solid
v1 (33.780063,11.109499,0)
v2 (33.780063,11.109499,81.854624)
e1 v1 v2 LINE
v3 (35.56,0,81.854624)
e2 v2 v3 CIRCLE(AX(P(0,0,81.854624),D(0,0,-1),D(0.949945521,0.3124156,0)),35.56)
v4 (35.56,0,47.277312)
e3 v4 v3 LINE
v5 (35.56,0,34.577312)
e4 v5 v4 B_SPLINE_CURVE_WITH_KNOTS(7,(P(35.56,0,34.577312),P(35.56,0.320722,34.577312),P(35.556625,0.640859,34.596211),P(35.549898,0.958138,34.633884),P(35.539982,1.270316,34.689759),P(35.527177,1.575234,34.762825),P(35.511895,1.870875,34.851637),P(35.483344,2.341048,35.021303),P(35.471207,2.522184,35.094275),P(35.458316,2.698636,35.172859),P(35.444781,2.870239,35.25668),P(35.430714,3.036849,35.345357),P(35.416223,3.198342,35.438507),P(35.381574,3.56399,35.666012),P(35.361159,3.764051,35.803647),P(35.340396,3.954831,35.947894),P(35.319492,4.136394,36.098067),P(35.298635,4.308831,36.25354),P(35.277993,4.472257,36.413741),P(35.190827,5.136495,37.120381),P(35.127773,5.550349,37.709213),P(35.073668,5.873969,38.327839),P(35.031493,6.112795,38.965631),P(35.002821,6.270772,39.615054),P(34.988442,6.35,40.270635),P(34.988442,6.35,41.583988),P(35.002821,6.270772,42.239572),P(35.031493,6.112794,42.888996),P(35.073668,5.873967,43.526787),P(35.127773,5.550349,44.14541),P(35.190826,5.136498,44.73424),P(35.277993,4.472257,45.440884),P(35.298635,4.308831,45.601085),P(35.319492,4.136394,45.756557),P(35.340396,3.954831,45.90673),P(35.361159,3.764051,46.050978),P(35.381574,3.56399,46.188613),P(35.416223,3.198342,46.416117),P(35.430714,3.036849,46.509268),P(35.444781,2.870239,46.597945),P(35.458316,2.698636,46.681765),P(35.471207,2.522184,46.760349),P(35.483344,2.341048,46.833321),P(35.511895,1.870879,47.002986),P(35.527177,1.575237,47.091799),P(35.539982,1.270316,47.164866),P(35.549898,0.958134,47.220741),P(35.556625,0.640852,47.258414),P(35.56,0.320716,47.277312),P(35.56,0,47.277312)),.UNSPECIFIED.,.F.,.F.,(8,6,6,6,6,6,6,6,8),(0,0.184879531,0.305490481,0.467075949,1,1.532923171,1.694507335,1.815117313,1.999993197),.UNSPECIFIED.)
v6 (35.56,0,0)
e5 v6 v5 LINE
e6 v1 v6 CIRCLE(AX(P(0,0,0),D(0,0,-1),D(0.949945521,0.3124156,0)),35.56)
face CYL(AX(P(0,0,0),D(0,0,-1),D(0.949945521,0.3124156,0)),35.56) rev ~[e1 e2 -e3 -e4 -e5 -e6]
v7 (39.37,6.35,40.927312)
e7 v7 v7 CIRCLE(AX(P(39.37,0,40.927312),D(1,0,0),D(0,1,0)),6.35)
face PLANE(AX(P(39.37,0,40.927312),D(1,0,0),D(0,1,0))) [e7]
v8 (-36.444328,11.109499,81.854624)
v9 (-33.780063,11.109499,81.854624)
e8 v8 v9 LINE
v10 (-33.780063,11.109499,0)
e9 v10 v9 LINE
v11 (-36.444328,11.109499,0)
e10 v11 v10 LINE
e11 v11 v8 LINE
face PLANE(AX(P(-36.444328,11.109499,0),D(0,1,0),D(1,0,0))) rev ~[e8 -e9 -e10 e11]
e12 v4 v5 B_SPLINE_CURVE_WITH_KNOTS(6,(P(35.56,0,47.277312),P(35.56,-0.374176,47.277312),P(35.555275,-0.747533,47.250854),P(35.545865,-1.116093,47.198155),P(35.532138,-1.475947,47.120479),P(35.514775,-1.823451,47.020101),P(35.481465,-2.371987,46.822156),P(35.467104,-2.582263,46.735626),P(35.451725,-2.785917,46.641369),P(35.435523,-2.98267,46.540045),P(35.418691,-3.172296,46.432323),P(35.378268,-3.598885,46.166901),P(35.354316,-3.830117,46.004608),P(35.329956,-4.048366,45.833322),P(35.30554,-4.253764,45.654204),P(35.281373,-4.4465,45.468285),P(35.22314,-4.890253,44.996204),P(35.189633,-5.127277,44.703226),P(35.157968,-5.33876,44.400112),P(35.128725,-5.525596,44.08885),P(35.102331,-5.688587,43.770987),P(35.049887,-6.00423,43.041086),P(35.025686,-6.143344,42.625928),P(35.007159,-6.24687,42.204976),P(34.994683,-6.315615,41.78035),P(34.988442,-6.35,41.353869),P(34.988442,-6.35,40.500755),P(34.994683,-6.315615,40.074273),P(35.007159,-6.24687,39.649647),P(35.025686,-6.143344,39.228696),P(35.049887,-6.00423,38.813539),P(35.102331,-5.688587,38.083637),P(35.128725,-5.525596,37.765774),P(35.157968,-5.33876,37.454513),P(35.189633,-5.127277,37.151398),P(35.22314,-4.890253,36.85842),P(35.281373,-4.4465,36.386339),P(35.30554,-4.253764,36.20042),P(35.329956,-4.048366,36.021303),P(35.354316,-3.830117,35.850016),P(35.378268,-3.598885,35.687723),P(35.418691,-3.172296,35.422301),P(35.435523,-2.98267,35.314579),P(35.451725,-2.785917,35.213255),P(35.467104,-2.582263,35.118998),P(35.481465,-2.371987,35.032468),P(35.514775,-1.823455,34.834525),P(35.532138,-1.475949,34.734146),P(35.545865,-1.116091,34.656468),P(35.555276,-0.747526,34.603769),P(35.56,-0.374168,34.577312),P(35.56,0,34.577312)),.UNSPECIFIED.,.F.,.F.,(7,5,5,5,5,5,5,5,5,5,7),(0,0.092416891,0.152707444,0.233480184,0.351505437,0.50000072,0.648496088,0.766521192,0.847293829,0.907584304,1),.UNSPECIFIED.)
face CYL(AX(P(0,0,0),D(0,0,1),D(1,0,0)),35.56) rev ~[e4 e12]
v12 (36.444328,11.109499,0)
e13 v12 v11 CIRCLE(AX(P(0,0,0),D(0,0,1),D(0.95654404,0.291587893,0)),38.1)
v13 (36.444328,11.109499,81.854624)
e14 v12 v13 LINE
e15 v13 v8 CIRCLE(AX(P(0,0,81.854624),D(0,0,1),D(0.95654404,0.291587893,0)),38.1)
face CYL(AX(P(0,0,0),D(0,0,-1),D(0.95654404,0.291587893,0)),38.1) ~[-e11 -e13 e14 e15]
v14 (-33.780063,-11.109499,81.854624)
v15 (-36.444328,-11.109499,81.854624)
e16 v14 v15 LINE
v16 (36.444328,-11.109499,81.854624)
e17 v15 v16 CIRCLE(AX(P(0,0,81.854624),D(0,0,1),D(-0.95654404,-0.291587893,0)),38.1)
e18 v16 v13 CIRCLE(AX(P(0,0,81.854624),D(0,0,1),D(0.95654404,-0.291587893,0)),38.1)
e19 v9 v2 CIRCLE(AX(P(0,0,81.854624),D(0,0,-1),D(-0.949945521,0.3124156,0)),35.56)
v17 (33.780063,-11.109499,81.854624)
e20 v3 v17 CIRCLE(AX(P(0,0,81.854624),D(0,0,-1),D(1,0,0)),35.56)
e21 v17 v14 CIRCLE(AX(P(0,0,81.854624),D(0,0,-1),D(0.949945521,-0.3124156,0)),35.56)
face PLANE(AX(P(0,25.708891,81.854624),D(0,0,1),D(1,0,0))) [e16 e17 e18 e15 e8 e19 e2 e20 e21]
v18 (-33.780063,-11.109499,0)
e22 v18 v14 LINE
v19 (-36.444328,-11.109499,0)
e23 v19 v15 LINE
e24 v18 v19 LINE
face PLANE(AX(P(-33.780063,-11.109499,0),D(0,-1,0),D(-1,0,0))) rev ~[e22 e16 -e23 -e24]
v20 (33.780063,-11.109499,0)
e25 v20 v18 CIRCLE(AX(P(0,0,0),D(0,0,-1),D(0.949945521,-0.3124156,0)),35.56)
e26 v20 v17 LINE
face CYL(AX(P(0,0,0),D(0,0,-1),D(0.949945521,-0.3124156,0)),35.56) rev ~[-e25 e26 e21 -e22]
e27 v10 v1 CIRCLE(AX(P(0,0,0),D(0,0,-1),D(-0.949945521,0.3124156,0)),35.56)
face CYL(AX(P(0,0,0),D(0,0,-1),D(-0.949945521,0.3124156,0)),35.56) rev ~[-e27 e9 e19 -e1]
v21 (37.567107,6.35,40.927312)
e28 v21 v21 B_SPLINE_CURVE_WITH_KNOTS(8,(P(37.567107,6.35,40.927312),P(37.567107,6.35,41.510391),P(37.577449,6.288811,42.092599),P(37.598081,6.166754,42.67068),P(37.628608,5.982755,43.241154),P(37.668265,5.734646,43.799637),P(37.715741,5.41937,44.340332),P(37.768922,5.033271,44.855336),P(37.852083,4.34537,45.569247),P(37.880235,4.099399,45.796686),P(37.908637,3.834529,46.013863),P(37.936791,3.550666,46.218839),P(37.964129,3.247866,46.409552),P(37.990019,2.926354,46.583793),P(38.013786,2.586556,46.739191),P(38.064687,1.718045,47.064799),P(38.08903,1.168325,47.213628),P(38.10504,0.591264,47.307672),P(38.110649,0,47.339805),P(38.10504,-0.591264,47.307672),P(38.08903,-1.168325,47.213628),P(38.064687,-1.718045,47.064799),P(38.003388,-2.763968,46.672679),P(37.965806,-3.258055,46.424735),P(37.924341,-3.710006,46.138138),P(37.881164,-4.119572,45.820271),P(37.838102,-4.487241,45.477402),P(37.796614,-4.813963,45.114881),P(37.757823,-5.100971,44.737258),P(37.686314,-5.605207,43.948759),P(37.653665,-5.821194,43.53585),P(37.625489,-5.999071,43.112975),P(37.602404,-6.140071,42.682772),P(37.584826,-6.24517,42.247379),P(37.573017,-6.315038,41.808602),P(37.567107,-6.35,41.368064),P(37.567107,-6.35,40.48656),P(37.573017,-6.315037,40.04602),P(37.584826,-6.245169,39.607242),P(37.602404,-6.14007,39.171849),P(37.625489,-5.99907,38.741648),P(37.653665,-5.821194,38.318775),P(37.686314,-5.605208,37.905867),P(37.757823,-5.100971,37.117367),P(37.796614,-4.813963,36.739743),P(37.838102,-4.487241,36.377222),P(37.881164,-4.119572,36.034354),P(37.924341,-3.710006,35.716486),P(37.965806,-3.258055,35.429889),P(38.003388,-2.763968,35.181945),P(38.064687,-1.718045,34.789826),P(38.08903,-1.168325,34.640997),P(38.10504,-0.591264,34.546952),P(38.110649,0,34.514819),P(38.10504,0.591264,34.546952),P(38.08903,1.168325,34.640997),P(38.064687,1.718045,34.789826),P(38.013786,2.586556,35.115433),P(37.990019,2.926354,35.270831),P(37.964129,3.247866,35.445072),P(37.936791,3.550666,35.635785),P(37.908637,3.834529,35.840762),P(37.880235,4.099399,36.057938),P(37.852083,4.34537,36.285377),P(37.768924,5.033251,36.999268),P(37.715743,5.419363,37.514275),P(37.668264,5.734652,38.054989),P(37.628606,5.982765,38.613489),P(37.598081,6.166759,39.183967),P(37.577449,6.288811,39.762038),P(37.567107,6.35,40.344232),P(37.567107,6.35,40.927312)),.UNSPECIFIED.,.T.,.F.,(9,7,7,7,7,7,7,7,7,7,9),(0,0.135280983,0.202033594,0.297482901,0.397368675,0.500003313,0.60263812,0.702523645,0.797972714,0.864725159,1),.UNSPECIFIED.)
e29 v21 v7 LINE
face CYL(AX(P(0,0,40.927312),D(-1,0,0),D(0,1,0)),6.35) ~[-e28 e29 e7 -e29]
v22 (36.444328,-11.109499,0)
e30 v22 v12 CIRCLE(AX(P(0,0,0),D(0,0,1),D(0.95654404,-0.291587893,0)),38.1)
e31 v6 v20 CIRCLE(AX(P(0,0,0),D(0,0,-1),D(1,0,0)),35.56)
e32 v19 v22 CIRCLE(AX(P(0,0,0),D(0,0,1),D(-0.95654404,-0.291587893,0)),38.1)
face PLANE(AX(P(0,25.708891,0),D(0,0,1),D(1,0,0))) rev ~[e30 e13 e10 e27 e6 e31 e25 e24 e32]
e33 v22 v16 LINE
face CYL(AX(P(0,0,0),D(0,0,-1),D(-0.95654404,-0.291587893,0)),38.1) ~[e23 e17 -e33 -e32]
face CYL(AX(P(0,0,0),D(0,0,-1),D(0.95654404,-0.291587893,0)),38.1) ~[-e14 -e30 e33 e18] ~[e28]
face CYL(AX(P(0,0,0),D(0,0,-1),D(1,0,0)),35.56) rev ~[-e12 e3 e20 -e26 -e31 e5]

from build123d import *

# Parameters (mm, degrees)
F1_DEPTH = 81.8546242
F2_R     = 6.35
F3_DEPTH = 39.37
F4_R     = 35.56
F5_DEPTH = 107.95


# Not quite as in the source:
# - a feature names something its author has since deleted; it is built from what else it names


with BuildPart() as f1:
    # F0 (on Top) → F1 (new body)
    with BuildSketch(Plane.XY):
        with BuildLine():
            Line((33.7800627271, 11.1094987354), (36.4443279242, 11.1094987354))
            ThreePointArc((36.4443279242, 11.1094987354), (0, 38.1), (-36.4443279242, 11.1094987354))
            Line((-36.4443279242, 11.1094987354), (-33.7800627271, 11.1094987354))
            ThreePointArc((-33.7800627271, 11.1094987354), (0, 35.56), (33.7800627271, 11.1094987354))
        make_face()
        with BuildLine():
            ThreePointArc((-36.4443279242, -11.1094987354), (0, -38.1), (36.4443279242, -11.1094987354))
            Line((36.4443279242, -11.1094987354), (33.7800627271, -11.1094987354))
            ThreePointArc((33.7800627271, -11.1094987354), (0, -35.56), (-33.7800627271, -11.1094987354))
            Line((-33.7800627271, -11.1094987354), (-36.4443279242, -11.1094987354))
        make_face()
        with BuildLine():
            Line((36.4443279242, -11.1094987354), (36.4443279242, 11.1094987354))
            Line((36.4443279242, 11.1094987354), (33.7800627271, 11.1094987354))
            ThreePointArc((33.7800627271, 11.1094987354), (35.1121961046, 5.6255919433), (35.56, 0))
            ThreePointArc((35.56, 0), (35.1121961046, -5.6255919433), (33.7800627271, -11.1094987354))
            Line((33.7800627271, -11.1094987354), (36.4443279242, -11.1094987354))
        make_face()
        with BuildLine():
            ThreePointArc((36.4443279242, -11.1094987354), (37.683808817, -5.6160976704), (38.1, 0))
            ThreePointArc((38.1, 0), (37.683808817, 5.6160976704), (36.4443279242, 11.1094987354))
            Line((36.4443279242, 11.1094987354), (36.4443279242, -11.1094987354))
        make_face()
    extrude(amount=F1_DEPTH)

    # F2 (on Right) → F3 (join)
    with BuildSketch(Plane.YZ):
        with Locations((0, 40.9273121)):
            Circle(F2_R)
    extrude(amount=F3_DEPTH)

    # F4 (on Top) → F5 (cut, symmetric)
    with BuildSketch(Plane.XY):
        Circle(F4_R)
    extrude(amount=F5_DEPTH, both=True, mode=Mode.SUBTRACT)


solid = f1.part
